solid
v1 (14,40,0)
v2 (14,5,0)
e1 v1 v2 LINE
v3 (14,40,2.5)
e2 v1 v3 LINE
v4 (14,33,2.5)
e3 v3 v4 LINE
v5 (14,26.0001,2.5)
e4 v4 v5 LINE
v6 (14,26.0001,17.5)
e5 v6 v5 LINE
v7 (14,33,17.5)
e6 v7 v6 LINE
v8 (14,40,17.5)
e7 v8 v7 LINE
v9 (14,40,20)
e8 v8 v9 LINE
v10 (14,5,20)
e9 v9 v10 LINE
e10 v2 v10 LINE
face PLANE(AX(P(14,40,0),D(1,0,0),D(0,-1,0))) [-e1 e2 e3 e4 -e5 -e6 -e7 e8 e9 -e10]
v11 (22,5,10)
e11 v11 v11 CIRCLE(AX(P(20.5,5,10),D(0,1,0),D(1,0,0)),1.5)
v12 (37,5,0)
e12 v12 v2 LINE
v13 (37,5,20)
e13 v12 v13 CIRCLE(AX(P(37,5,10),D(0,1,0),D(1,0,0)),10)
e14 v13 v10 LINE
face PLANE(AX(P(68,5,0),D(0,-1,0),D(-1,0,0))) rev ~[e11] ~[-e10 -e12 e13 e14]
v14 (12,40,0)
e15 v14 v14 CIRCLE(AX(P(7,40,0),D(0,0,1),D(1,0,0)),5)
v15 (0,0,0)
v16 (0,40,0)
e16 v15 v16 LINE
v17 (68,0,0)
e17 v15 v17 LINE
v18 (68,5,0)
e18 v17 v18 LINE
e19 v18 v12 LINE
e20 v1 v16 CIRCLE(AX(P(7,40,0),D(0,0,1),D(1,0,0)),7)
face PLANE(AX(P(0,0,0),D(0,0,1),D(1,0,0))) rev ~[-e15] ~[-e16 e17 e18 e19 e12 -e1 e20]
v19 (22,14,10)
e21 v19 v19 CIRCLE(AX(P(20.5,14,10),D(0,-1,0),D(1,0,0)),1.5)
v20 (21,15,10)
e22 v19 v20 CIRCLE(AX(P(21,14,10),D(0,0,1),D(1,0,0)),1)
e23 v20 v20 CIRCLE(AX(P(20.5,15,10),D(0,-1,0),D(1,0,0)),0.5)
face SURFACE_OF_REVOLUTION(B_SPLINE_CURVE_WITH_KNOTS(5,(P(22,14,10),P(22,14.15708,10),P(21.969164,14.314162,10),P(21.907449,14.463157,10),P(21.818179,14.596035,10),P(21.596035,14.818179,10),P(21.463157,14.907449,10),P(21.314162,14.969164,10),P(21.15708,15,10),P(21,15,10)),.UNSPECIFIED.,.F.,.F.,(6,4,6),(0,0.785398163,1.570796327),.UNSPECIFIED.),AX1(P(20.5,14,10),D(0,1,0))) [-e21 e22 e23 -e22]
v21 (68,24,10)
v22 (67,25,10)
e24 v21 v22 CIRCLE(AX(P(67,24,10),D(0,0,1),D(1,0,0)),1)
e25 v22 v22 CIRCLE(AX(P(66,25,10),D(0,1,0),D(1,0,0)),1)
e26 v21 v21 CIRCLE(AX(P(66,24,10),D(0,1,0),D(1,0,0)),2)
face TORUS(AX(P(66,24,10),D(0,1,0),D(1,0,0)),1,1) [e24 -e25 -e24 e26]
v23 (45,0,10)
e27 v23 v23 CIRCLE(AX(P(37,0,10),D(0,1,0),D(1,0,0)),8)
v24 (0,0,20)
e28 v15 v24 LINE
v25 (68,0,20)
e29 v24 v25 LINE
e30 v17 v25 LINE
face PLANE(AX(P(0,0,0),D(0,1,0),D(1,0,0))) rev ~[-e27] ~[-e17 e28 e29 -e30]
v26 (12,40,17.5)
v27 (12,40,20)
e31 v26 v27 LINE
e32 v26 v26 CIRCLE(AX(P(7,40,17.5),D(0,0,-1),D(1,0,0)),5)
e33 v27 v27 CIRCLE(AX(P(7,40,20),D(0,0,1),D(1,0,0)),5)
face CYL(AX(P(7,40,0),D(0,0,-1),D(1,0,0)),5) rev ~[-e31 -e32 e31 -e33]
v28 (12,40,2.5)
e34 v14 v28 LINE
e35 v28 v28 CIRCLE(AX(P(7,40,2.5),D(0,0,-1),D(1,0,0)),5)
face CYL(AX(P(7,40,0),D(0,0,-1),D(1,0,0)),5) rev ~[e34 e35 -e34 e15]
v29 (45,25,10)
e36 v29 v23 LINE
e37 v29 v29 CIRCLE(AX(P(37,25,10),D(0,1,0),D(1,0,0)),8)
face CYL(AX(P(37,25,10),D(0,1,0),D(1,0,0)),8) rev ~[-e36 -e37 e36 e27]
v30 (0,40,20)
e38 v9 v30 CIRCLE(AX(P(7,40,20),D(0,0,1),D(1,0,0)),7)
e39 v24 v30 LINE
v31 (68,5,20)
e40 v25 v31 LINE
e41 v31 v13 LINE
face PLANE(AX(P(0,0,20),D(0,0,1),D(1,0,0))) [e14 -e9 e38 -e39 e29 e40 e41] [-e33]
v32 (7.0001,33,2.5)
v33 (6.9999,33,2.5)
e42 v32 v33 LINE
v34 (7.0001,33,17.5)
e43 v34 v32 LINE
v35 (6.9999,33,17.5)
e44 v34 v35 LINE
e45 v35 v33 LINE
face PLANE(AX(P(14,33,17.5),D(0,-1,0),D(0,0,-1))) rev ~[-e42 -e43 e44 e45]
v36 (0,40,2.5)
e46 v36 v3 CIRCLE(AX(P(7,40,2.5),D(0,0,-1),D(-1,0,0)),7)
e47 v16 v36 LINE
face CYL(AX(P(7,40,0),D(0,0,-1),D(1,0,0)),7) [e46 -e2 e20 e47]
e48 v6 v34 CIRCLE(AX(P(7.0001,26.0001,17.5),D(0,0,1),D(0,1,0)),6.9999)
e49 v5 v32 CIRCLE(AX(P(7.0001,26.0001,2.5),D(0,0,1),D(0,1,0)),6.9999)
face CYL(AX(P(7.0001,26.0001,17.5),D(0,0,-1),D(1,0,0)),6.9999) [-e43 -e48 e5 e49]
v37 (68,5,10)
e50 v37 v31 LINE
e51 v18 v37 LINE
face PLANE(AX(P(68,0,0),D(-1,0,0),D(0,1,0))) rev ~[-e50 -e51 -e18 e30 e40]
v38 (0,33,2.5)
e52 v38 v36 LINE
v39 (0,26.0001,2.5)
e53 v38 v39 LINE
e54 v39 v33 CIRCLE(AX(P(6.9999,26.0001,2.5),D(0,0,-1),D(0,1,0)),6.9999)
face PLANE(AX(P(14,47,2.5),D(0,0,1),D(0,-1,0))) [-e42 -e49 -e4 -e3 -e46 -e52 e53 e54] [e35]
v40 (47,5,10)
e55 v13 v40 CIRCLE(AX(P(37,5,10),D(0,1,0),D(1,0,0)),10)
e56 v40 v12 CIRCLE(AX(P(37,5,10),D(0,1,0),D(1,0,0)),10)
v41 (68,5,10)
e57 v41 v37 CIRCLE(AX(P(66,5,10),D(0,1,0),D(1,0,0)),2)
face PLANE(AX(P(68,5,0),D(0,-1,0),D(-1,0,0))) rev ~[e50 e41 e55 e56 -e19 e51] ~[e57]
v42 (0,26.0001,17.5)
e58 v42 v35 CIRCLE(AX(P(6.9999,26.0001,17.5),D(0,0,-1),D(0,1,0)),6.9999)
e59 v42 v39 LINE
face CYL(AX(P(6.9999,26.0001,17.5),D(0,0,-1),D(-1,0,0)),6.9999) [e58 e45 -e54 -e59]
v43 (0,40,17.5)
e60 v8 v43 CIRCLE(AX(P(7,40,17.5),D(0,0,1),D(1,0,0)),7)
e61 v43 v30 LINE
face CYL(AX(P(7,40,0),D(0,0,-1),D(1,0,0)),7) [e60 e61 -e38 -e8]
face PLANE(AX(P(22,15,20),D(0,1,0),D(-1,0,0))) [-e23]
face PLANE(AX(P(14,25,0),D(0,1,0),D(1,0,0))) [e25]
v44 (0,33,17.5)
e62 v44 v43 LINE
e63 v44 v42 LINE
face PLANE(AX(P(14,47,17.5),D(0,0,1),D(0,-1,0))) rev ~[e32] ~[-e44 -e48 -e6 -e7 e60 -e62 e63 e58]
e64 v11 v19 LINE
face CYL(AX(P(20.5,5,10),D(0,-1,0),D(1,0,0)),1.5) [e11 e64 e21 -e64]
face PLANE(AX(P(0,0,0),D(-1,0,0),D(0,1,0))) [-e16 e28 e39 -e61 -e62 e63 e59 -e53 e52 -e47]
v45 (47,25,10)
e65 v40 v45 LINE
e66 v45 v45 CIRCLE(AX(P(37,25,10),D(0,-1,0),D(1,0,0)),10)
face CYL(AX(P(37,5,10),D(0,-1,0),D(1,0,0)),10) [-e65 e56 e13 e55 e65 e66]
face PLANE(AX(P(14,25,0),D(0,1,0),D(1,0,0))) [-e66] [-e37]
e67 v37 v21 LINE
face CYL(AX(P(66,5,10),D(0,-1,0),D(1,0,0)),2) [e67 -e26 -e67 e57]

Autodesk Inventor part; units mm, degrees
ref_plane "YZ Plane" through (0, 0, 0) normal (1, 0, 0) x (0, 1, 0)
ref_plane "XZ Plane" through (0, 0, 0) normal (0, 1, 0) x (-1, 0, 0)
ref_plane "XY Plane" through (0, 0, 0) normal (0, 0, 1) x (1, 0, 0)
sketch "Sketch1" plane through (0, 0, 0) normal (0, 0, 1) x (1, 0, 0)
  line L0 (0, 0) -> (0, 40)
  line L1 (0, 0) -> (68, 0)
  line L2 (68, 0) -> (68, 5)
  line L3 (68, 5) -> (14, 5)
  arc A0 (14, 40) -> (0, 40) centre (7, 40) ccw
  line L4 (14, 40) -> (14, 5)
  circle A1 centre (7, 40) radius 5
  dimension "d0" = 40
  dimension "d2" = 5
  dimension "d6" = 7
  dimension "d7" = 10
  dimension "d8" = 14
  dimension "d9" = 54
extrude "Extrusion1" add sketch "Sketch1" along normal blind 20
sketch "Sketch2" plane through (14, 5, 0) normal (0, 1, 0) x (1, 0, 0)
  circle A0 centre (6.5, -10) radius 1.5
  line L0 (0, 0) -> (0, -20) projected
  circle A1 centre (23, -10) radius 10
  line L1 (0, 0) -> (54, 0) projected
  circle A2 centre (52, -10) radius 2
  line L2 (54, 0) -> (54, -20) projected
  point P0 (-14, 0)
  dimension "d12" = 3
  dimension "d13" = 6.5
  dimension "d14" = 20
  dimension "d16" = 23
  dimension "d19" = 10
  dimension "d20" = 4
  dimension "d21" = 10
  dimension "d22" = 17
extrude "Extrusion2" add sketch "Sketch2" along normal blind 20
sketch "Sketch4" plane through (0, 0, 20) normal (0, 0, 1) x (1, 0, 0)
  line L0 (22, 25) -> (19, 25) projected
  line L1 (19, 25) -> (22, 25)
  line L2 (22, 5) -> (22, 25) projected
  line L3 (22, 25) -> (22, 15)
  line L4 (22, 15) -> (19, 15)
  line L5 (19, 5) -> (19, 25) projected
  point P0 (0, 0)
  dimension "d25" = 10
extrude "Extrusion3" cut sketch "Sketch4" against normal blind 20
fillet "Fillet1" radius 1 1 edges at (19, 15, 10)
fillet "Fillet2" radius 1 1 edges at (64, 25, 10)
sketch "Sketch5" plane through (37, 25, 10) normal (0, 1, 0) x (1, 0, 0)
  circle A0 centre (0, 0) radius 8
  point P0 (-37, 10)
  dimension "d30" = 16
extrude "Extrusion4" cut sketch "Sketch5" against normal blind 30
sketch "Sketch6" plane through (14, 5, 0) normal (1, 0, 0) x (0, 0, -1)
  point P0 (0, -5)
sketch "Sketch7" plane through (14, 5, 0) normal (1, 0, 0) x (0, 0, -1)
  line L0 (-10, 41.0364) -> (-10, 39.6436)
  line L1 (0, 42) -> (-20, 42) projected
  line L2 (-2.5, 42) -> (-2.5, 28)
  line L3 (-17.5, 42) -> (-17.5, 28)
  line L4 (-17.5, 42) -> (-2.5, 42)
  line L5 (0, 30) -> (-20, 30) projected
  line L6 (-17.5, 28) -> (-2.5, 28)
  point P0 (0, -5)
  dimension "d40" = 14
  dimension "d41" = 14
  dimension "d42" = 15
extrude "Extrusion5" cut sketch "Sketch7" against normal blind 14
fillet "Fillet3" radius 7 2 edges at (14, 33, 10) (0, 33, 10)
equation "\"d19\" = 0.5 * d14"
equation "\"d21\" = d19"
equation "\"d40\" = d41"
properties part number "ValveMk2"
